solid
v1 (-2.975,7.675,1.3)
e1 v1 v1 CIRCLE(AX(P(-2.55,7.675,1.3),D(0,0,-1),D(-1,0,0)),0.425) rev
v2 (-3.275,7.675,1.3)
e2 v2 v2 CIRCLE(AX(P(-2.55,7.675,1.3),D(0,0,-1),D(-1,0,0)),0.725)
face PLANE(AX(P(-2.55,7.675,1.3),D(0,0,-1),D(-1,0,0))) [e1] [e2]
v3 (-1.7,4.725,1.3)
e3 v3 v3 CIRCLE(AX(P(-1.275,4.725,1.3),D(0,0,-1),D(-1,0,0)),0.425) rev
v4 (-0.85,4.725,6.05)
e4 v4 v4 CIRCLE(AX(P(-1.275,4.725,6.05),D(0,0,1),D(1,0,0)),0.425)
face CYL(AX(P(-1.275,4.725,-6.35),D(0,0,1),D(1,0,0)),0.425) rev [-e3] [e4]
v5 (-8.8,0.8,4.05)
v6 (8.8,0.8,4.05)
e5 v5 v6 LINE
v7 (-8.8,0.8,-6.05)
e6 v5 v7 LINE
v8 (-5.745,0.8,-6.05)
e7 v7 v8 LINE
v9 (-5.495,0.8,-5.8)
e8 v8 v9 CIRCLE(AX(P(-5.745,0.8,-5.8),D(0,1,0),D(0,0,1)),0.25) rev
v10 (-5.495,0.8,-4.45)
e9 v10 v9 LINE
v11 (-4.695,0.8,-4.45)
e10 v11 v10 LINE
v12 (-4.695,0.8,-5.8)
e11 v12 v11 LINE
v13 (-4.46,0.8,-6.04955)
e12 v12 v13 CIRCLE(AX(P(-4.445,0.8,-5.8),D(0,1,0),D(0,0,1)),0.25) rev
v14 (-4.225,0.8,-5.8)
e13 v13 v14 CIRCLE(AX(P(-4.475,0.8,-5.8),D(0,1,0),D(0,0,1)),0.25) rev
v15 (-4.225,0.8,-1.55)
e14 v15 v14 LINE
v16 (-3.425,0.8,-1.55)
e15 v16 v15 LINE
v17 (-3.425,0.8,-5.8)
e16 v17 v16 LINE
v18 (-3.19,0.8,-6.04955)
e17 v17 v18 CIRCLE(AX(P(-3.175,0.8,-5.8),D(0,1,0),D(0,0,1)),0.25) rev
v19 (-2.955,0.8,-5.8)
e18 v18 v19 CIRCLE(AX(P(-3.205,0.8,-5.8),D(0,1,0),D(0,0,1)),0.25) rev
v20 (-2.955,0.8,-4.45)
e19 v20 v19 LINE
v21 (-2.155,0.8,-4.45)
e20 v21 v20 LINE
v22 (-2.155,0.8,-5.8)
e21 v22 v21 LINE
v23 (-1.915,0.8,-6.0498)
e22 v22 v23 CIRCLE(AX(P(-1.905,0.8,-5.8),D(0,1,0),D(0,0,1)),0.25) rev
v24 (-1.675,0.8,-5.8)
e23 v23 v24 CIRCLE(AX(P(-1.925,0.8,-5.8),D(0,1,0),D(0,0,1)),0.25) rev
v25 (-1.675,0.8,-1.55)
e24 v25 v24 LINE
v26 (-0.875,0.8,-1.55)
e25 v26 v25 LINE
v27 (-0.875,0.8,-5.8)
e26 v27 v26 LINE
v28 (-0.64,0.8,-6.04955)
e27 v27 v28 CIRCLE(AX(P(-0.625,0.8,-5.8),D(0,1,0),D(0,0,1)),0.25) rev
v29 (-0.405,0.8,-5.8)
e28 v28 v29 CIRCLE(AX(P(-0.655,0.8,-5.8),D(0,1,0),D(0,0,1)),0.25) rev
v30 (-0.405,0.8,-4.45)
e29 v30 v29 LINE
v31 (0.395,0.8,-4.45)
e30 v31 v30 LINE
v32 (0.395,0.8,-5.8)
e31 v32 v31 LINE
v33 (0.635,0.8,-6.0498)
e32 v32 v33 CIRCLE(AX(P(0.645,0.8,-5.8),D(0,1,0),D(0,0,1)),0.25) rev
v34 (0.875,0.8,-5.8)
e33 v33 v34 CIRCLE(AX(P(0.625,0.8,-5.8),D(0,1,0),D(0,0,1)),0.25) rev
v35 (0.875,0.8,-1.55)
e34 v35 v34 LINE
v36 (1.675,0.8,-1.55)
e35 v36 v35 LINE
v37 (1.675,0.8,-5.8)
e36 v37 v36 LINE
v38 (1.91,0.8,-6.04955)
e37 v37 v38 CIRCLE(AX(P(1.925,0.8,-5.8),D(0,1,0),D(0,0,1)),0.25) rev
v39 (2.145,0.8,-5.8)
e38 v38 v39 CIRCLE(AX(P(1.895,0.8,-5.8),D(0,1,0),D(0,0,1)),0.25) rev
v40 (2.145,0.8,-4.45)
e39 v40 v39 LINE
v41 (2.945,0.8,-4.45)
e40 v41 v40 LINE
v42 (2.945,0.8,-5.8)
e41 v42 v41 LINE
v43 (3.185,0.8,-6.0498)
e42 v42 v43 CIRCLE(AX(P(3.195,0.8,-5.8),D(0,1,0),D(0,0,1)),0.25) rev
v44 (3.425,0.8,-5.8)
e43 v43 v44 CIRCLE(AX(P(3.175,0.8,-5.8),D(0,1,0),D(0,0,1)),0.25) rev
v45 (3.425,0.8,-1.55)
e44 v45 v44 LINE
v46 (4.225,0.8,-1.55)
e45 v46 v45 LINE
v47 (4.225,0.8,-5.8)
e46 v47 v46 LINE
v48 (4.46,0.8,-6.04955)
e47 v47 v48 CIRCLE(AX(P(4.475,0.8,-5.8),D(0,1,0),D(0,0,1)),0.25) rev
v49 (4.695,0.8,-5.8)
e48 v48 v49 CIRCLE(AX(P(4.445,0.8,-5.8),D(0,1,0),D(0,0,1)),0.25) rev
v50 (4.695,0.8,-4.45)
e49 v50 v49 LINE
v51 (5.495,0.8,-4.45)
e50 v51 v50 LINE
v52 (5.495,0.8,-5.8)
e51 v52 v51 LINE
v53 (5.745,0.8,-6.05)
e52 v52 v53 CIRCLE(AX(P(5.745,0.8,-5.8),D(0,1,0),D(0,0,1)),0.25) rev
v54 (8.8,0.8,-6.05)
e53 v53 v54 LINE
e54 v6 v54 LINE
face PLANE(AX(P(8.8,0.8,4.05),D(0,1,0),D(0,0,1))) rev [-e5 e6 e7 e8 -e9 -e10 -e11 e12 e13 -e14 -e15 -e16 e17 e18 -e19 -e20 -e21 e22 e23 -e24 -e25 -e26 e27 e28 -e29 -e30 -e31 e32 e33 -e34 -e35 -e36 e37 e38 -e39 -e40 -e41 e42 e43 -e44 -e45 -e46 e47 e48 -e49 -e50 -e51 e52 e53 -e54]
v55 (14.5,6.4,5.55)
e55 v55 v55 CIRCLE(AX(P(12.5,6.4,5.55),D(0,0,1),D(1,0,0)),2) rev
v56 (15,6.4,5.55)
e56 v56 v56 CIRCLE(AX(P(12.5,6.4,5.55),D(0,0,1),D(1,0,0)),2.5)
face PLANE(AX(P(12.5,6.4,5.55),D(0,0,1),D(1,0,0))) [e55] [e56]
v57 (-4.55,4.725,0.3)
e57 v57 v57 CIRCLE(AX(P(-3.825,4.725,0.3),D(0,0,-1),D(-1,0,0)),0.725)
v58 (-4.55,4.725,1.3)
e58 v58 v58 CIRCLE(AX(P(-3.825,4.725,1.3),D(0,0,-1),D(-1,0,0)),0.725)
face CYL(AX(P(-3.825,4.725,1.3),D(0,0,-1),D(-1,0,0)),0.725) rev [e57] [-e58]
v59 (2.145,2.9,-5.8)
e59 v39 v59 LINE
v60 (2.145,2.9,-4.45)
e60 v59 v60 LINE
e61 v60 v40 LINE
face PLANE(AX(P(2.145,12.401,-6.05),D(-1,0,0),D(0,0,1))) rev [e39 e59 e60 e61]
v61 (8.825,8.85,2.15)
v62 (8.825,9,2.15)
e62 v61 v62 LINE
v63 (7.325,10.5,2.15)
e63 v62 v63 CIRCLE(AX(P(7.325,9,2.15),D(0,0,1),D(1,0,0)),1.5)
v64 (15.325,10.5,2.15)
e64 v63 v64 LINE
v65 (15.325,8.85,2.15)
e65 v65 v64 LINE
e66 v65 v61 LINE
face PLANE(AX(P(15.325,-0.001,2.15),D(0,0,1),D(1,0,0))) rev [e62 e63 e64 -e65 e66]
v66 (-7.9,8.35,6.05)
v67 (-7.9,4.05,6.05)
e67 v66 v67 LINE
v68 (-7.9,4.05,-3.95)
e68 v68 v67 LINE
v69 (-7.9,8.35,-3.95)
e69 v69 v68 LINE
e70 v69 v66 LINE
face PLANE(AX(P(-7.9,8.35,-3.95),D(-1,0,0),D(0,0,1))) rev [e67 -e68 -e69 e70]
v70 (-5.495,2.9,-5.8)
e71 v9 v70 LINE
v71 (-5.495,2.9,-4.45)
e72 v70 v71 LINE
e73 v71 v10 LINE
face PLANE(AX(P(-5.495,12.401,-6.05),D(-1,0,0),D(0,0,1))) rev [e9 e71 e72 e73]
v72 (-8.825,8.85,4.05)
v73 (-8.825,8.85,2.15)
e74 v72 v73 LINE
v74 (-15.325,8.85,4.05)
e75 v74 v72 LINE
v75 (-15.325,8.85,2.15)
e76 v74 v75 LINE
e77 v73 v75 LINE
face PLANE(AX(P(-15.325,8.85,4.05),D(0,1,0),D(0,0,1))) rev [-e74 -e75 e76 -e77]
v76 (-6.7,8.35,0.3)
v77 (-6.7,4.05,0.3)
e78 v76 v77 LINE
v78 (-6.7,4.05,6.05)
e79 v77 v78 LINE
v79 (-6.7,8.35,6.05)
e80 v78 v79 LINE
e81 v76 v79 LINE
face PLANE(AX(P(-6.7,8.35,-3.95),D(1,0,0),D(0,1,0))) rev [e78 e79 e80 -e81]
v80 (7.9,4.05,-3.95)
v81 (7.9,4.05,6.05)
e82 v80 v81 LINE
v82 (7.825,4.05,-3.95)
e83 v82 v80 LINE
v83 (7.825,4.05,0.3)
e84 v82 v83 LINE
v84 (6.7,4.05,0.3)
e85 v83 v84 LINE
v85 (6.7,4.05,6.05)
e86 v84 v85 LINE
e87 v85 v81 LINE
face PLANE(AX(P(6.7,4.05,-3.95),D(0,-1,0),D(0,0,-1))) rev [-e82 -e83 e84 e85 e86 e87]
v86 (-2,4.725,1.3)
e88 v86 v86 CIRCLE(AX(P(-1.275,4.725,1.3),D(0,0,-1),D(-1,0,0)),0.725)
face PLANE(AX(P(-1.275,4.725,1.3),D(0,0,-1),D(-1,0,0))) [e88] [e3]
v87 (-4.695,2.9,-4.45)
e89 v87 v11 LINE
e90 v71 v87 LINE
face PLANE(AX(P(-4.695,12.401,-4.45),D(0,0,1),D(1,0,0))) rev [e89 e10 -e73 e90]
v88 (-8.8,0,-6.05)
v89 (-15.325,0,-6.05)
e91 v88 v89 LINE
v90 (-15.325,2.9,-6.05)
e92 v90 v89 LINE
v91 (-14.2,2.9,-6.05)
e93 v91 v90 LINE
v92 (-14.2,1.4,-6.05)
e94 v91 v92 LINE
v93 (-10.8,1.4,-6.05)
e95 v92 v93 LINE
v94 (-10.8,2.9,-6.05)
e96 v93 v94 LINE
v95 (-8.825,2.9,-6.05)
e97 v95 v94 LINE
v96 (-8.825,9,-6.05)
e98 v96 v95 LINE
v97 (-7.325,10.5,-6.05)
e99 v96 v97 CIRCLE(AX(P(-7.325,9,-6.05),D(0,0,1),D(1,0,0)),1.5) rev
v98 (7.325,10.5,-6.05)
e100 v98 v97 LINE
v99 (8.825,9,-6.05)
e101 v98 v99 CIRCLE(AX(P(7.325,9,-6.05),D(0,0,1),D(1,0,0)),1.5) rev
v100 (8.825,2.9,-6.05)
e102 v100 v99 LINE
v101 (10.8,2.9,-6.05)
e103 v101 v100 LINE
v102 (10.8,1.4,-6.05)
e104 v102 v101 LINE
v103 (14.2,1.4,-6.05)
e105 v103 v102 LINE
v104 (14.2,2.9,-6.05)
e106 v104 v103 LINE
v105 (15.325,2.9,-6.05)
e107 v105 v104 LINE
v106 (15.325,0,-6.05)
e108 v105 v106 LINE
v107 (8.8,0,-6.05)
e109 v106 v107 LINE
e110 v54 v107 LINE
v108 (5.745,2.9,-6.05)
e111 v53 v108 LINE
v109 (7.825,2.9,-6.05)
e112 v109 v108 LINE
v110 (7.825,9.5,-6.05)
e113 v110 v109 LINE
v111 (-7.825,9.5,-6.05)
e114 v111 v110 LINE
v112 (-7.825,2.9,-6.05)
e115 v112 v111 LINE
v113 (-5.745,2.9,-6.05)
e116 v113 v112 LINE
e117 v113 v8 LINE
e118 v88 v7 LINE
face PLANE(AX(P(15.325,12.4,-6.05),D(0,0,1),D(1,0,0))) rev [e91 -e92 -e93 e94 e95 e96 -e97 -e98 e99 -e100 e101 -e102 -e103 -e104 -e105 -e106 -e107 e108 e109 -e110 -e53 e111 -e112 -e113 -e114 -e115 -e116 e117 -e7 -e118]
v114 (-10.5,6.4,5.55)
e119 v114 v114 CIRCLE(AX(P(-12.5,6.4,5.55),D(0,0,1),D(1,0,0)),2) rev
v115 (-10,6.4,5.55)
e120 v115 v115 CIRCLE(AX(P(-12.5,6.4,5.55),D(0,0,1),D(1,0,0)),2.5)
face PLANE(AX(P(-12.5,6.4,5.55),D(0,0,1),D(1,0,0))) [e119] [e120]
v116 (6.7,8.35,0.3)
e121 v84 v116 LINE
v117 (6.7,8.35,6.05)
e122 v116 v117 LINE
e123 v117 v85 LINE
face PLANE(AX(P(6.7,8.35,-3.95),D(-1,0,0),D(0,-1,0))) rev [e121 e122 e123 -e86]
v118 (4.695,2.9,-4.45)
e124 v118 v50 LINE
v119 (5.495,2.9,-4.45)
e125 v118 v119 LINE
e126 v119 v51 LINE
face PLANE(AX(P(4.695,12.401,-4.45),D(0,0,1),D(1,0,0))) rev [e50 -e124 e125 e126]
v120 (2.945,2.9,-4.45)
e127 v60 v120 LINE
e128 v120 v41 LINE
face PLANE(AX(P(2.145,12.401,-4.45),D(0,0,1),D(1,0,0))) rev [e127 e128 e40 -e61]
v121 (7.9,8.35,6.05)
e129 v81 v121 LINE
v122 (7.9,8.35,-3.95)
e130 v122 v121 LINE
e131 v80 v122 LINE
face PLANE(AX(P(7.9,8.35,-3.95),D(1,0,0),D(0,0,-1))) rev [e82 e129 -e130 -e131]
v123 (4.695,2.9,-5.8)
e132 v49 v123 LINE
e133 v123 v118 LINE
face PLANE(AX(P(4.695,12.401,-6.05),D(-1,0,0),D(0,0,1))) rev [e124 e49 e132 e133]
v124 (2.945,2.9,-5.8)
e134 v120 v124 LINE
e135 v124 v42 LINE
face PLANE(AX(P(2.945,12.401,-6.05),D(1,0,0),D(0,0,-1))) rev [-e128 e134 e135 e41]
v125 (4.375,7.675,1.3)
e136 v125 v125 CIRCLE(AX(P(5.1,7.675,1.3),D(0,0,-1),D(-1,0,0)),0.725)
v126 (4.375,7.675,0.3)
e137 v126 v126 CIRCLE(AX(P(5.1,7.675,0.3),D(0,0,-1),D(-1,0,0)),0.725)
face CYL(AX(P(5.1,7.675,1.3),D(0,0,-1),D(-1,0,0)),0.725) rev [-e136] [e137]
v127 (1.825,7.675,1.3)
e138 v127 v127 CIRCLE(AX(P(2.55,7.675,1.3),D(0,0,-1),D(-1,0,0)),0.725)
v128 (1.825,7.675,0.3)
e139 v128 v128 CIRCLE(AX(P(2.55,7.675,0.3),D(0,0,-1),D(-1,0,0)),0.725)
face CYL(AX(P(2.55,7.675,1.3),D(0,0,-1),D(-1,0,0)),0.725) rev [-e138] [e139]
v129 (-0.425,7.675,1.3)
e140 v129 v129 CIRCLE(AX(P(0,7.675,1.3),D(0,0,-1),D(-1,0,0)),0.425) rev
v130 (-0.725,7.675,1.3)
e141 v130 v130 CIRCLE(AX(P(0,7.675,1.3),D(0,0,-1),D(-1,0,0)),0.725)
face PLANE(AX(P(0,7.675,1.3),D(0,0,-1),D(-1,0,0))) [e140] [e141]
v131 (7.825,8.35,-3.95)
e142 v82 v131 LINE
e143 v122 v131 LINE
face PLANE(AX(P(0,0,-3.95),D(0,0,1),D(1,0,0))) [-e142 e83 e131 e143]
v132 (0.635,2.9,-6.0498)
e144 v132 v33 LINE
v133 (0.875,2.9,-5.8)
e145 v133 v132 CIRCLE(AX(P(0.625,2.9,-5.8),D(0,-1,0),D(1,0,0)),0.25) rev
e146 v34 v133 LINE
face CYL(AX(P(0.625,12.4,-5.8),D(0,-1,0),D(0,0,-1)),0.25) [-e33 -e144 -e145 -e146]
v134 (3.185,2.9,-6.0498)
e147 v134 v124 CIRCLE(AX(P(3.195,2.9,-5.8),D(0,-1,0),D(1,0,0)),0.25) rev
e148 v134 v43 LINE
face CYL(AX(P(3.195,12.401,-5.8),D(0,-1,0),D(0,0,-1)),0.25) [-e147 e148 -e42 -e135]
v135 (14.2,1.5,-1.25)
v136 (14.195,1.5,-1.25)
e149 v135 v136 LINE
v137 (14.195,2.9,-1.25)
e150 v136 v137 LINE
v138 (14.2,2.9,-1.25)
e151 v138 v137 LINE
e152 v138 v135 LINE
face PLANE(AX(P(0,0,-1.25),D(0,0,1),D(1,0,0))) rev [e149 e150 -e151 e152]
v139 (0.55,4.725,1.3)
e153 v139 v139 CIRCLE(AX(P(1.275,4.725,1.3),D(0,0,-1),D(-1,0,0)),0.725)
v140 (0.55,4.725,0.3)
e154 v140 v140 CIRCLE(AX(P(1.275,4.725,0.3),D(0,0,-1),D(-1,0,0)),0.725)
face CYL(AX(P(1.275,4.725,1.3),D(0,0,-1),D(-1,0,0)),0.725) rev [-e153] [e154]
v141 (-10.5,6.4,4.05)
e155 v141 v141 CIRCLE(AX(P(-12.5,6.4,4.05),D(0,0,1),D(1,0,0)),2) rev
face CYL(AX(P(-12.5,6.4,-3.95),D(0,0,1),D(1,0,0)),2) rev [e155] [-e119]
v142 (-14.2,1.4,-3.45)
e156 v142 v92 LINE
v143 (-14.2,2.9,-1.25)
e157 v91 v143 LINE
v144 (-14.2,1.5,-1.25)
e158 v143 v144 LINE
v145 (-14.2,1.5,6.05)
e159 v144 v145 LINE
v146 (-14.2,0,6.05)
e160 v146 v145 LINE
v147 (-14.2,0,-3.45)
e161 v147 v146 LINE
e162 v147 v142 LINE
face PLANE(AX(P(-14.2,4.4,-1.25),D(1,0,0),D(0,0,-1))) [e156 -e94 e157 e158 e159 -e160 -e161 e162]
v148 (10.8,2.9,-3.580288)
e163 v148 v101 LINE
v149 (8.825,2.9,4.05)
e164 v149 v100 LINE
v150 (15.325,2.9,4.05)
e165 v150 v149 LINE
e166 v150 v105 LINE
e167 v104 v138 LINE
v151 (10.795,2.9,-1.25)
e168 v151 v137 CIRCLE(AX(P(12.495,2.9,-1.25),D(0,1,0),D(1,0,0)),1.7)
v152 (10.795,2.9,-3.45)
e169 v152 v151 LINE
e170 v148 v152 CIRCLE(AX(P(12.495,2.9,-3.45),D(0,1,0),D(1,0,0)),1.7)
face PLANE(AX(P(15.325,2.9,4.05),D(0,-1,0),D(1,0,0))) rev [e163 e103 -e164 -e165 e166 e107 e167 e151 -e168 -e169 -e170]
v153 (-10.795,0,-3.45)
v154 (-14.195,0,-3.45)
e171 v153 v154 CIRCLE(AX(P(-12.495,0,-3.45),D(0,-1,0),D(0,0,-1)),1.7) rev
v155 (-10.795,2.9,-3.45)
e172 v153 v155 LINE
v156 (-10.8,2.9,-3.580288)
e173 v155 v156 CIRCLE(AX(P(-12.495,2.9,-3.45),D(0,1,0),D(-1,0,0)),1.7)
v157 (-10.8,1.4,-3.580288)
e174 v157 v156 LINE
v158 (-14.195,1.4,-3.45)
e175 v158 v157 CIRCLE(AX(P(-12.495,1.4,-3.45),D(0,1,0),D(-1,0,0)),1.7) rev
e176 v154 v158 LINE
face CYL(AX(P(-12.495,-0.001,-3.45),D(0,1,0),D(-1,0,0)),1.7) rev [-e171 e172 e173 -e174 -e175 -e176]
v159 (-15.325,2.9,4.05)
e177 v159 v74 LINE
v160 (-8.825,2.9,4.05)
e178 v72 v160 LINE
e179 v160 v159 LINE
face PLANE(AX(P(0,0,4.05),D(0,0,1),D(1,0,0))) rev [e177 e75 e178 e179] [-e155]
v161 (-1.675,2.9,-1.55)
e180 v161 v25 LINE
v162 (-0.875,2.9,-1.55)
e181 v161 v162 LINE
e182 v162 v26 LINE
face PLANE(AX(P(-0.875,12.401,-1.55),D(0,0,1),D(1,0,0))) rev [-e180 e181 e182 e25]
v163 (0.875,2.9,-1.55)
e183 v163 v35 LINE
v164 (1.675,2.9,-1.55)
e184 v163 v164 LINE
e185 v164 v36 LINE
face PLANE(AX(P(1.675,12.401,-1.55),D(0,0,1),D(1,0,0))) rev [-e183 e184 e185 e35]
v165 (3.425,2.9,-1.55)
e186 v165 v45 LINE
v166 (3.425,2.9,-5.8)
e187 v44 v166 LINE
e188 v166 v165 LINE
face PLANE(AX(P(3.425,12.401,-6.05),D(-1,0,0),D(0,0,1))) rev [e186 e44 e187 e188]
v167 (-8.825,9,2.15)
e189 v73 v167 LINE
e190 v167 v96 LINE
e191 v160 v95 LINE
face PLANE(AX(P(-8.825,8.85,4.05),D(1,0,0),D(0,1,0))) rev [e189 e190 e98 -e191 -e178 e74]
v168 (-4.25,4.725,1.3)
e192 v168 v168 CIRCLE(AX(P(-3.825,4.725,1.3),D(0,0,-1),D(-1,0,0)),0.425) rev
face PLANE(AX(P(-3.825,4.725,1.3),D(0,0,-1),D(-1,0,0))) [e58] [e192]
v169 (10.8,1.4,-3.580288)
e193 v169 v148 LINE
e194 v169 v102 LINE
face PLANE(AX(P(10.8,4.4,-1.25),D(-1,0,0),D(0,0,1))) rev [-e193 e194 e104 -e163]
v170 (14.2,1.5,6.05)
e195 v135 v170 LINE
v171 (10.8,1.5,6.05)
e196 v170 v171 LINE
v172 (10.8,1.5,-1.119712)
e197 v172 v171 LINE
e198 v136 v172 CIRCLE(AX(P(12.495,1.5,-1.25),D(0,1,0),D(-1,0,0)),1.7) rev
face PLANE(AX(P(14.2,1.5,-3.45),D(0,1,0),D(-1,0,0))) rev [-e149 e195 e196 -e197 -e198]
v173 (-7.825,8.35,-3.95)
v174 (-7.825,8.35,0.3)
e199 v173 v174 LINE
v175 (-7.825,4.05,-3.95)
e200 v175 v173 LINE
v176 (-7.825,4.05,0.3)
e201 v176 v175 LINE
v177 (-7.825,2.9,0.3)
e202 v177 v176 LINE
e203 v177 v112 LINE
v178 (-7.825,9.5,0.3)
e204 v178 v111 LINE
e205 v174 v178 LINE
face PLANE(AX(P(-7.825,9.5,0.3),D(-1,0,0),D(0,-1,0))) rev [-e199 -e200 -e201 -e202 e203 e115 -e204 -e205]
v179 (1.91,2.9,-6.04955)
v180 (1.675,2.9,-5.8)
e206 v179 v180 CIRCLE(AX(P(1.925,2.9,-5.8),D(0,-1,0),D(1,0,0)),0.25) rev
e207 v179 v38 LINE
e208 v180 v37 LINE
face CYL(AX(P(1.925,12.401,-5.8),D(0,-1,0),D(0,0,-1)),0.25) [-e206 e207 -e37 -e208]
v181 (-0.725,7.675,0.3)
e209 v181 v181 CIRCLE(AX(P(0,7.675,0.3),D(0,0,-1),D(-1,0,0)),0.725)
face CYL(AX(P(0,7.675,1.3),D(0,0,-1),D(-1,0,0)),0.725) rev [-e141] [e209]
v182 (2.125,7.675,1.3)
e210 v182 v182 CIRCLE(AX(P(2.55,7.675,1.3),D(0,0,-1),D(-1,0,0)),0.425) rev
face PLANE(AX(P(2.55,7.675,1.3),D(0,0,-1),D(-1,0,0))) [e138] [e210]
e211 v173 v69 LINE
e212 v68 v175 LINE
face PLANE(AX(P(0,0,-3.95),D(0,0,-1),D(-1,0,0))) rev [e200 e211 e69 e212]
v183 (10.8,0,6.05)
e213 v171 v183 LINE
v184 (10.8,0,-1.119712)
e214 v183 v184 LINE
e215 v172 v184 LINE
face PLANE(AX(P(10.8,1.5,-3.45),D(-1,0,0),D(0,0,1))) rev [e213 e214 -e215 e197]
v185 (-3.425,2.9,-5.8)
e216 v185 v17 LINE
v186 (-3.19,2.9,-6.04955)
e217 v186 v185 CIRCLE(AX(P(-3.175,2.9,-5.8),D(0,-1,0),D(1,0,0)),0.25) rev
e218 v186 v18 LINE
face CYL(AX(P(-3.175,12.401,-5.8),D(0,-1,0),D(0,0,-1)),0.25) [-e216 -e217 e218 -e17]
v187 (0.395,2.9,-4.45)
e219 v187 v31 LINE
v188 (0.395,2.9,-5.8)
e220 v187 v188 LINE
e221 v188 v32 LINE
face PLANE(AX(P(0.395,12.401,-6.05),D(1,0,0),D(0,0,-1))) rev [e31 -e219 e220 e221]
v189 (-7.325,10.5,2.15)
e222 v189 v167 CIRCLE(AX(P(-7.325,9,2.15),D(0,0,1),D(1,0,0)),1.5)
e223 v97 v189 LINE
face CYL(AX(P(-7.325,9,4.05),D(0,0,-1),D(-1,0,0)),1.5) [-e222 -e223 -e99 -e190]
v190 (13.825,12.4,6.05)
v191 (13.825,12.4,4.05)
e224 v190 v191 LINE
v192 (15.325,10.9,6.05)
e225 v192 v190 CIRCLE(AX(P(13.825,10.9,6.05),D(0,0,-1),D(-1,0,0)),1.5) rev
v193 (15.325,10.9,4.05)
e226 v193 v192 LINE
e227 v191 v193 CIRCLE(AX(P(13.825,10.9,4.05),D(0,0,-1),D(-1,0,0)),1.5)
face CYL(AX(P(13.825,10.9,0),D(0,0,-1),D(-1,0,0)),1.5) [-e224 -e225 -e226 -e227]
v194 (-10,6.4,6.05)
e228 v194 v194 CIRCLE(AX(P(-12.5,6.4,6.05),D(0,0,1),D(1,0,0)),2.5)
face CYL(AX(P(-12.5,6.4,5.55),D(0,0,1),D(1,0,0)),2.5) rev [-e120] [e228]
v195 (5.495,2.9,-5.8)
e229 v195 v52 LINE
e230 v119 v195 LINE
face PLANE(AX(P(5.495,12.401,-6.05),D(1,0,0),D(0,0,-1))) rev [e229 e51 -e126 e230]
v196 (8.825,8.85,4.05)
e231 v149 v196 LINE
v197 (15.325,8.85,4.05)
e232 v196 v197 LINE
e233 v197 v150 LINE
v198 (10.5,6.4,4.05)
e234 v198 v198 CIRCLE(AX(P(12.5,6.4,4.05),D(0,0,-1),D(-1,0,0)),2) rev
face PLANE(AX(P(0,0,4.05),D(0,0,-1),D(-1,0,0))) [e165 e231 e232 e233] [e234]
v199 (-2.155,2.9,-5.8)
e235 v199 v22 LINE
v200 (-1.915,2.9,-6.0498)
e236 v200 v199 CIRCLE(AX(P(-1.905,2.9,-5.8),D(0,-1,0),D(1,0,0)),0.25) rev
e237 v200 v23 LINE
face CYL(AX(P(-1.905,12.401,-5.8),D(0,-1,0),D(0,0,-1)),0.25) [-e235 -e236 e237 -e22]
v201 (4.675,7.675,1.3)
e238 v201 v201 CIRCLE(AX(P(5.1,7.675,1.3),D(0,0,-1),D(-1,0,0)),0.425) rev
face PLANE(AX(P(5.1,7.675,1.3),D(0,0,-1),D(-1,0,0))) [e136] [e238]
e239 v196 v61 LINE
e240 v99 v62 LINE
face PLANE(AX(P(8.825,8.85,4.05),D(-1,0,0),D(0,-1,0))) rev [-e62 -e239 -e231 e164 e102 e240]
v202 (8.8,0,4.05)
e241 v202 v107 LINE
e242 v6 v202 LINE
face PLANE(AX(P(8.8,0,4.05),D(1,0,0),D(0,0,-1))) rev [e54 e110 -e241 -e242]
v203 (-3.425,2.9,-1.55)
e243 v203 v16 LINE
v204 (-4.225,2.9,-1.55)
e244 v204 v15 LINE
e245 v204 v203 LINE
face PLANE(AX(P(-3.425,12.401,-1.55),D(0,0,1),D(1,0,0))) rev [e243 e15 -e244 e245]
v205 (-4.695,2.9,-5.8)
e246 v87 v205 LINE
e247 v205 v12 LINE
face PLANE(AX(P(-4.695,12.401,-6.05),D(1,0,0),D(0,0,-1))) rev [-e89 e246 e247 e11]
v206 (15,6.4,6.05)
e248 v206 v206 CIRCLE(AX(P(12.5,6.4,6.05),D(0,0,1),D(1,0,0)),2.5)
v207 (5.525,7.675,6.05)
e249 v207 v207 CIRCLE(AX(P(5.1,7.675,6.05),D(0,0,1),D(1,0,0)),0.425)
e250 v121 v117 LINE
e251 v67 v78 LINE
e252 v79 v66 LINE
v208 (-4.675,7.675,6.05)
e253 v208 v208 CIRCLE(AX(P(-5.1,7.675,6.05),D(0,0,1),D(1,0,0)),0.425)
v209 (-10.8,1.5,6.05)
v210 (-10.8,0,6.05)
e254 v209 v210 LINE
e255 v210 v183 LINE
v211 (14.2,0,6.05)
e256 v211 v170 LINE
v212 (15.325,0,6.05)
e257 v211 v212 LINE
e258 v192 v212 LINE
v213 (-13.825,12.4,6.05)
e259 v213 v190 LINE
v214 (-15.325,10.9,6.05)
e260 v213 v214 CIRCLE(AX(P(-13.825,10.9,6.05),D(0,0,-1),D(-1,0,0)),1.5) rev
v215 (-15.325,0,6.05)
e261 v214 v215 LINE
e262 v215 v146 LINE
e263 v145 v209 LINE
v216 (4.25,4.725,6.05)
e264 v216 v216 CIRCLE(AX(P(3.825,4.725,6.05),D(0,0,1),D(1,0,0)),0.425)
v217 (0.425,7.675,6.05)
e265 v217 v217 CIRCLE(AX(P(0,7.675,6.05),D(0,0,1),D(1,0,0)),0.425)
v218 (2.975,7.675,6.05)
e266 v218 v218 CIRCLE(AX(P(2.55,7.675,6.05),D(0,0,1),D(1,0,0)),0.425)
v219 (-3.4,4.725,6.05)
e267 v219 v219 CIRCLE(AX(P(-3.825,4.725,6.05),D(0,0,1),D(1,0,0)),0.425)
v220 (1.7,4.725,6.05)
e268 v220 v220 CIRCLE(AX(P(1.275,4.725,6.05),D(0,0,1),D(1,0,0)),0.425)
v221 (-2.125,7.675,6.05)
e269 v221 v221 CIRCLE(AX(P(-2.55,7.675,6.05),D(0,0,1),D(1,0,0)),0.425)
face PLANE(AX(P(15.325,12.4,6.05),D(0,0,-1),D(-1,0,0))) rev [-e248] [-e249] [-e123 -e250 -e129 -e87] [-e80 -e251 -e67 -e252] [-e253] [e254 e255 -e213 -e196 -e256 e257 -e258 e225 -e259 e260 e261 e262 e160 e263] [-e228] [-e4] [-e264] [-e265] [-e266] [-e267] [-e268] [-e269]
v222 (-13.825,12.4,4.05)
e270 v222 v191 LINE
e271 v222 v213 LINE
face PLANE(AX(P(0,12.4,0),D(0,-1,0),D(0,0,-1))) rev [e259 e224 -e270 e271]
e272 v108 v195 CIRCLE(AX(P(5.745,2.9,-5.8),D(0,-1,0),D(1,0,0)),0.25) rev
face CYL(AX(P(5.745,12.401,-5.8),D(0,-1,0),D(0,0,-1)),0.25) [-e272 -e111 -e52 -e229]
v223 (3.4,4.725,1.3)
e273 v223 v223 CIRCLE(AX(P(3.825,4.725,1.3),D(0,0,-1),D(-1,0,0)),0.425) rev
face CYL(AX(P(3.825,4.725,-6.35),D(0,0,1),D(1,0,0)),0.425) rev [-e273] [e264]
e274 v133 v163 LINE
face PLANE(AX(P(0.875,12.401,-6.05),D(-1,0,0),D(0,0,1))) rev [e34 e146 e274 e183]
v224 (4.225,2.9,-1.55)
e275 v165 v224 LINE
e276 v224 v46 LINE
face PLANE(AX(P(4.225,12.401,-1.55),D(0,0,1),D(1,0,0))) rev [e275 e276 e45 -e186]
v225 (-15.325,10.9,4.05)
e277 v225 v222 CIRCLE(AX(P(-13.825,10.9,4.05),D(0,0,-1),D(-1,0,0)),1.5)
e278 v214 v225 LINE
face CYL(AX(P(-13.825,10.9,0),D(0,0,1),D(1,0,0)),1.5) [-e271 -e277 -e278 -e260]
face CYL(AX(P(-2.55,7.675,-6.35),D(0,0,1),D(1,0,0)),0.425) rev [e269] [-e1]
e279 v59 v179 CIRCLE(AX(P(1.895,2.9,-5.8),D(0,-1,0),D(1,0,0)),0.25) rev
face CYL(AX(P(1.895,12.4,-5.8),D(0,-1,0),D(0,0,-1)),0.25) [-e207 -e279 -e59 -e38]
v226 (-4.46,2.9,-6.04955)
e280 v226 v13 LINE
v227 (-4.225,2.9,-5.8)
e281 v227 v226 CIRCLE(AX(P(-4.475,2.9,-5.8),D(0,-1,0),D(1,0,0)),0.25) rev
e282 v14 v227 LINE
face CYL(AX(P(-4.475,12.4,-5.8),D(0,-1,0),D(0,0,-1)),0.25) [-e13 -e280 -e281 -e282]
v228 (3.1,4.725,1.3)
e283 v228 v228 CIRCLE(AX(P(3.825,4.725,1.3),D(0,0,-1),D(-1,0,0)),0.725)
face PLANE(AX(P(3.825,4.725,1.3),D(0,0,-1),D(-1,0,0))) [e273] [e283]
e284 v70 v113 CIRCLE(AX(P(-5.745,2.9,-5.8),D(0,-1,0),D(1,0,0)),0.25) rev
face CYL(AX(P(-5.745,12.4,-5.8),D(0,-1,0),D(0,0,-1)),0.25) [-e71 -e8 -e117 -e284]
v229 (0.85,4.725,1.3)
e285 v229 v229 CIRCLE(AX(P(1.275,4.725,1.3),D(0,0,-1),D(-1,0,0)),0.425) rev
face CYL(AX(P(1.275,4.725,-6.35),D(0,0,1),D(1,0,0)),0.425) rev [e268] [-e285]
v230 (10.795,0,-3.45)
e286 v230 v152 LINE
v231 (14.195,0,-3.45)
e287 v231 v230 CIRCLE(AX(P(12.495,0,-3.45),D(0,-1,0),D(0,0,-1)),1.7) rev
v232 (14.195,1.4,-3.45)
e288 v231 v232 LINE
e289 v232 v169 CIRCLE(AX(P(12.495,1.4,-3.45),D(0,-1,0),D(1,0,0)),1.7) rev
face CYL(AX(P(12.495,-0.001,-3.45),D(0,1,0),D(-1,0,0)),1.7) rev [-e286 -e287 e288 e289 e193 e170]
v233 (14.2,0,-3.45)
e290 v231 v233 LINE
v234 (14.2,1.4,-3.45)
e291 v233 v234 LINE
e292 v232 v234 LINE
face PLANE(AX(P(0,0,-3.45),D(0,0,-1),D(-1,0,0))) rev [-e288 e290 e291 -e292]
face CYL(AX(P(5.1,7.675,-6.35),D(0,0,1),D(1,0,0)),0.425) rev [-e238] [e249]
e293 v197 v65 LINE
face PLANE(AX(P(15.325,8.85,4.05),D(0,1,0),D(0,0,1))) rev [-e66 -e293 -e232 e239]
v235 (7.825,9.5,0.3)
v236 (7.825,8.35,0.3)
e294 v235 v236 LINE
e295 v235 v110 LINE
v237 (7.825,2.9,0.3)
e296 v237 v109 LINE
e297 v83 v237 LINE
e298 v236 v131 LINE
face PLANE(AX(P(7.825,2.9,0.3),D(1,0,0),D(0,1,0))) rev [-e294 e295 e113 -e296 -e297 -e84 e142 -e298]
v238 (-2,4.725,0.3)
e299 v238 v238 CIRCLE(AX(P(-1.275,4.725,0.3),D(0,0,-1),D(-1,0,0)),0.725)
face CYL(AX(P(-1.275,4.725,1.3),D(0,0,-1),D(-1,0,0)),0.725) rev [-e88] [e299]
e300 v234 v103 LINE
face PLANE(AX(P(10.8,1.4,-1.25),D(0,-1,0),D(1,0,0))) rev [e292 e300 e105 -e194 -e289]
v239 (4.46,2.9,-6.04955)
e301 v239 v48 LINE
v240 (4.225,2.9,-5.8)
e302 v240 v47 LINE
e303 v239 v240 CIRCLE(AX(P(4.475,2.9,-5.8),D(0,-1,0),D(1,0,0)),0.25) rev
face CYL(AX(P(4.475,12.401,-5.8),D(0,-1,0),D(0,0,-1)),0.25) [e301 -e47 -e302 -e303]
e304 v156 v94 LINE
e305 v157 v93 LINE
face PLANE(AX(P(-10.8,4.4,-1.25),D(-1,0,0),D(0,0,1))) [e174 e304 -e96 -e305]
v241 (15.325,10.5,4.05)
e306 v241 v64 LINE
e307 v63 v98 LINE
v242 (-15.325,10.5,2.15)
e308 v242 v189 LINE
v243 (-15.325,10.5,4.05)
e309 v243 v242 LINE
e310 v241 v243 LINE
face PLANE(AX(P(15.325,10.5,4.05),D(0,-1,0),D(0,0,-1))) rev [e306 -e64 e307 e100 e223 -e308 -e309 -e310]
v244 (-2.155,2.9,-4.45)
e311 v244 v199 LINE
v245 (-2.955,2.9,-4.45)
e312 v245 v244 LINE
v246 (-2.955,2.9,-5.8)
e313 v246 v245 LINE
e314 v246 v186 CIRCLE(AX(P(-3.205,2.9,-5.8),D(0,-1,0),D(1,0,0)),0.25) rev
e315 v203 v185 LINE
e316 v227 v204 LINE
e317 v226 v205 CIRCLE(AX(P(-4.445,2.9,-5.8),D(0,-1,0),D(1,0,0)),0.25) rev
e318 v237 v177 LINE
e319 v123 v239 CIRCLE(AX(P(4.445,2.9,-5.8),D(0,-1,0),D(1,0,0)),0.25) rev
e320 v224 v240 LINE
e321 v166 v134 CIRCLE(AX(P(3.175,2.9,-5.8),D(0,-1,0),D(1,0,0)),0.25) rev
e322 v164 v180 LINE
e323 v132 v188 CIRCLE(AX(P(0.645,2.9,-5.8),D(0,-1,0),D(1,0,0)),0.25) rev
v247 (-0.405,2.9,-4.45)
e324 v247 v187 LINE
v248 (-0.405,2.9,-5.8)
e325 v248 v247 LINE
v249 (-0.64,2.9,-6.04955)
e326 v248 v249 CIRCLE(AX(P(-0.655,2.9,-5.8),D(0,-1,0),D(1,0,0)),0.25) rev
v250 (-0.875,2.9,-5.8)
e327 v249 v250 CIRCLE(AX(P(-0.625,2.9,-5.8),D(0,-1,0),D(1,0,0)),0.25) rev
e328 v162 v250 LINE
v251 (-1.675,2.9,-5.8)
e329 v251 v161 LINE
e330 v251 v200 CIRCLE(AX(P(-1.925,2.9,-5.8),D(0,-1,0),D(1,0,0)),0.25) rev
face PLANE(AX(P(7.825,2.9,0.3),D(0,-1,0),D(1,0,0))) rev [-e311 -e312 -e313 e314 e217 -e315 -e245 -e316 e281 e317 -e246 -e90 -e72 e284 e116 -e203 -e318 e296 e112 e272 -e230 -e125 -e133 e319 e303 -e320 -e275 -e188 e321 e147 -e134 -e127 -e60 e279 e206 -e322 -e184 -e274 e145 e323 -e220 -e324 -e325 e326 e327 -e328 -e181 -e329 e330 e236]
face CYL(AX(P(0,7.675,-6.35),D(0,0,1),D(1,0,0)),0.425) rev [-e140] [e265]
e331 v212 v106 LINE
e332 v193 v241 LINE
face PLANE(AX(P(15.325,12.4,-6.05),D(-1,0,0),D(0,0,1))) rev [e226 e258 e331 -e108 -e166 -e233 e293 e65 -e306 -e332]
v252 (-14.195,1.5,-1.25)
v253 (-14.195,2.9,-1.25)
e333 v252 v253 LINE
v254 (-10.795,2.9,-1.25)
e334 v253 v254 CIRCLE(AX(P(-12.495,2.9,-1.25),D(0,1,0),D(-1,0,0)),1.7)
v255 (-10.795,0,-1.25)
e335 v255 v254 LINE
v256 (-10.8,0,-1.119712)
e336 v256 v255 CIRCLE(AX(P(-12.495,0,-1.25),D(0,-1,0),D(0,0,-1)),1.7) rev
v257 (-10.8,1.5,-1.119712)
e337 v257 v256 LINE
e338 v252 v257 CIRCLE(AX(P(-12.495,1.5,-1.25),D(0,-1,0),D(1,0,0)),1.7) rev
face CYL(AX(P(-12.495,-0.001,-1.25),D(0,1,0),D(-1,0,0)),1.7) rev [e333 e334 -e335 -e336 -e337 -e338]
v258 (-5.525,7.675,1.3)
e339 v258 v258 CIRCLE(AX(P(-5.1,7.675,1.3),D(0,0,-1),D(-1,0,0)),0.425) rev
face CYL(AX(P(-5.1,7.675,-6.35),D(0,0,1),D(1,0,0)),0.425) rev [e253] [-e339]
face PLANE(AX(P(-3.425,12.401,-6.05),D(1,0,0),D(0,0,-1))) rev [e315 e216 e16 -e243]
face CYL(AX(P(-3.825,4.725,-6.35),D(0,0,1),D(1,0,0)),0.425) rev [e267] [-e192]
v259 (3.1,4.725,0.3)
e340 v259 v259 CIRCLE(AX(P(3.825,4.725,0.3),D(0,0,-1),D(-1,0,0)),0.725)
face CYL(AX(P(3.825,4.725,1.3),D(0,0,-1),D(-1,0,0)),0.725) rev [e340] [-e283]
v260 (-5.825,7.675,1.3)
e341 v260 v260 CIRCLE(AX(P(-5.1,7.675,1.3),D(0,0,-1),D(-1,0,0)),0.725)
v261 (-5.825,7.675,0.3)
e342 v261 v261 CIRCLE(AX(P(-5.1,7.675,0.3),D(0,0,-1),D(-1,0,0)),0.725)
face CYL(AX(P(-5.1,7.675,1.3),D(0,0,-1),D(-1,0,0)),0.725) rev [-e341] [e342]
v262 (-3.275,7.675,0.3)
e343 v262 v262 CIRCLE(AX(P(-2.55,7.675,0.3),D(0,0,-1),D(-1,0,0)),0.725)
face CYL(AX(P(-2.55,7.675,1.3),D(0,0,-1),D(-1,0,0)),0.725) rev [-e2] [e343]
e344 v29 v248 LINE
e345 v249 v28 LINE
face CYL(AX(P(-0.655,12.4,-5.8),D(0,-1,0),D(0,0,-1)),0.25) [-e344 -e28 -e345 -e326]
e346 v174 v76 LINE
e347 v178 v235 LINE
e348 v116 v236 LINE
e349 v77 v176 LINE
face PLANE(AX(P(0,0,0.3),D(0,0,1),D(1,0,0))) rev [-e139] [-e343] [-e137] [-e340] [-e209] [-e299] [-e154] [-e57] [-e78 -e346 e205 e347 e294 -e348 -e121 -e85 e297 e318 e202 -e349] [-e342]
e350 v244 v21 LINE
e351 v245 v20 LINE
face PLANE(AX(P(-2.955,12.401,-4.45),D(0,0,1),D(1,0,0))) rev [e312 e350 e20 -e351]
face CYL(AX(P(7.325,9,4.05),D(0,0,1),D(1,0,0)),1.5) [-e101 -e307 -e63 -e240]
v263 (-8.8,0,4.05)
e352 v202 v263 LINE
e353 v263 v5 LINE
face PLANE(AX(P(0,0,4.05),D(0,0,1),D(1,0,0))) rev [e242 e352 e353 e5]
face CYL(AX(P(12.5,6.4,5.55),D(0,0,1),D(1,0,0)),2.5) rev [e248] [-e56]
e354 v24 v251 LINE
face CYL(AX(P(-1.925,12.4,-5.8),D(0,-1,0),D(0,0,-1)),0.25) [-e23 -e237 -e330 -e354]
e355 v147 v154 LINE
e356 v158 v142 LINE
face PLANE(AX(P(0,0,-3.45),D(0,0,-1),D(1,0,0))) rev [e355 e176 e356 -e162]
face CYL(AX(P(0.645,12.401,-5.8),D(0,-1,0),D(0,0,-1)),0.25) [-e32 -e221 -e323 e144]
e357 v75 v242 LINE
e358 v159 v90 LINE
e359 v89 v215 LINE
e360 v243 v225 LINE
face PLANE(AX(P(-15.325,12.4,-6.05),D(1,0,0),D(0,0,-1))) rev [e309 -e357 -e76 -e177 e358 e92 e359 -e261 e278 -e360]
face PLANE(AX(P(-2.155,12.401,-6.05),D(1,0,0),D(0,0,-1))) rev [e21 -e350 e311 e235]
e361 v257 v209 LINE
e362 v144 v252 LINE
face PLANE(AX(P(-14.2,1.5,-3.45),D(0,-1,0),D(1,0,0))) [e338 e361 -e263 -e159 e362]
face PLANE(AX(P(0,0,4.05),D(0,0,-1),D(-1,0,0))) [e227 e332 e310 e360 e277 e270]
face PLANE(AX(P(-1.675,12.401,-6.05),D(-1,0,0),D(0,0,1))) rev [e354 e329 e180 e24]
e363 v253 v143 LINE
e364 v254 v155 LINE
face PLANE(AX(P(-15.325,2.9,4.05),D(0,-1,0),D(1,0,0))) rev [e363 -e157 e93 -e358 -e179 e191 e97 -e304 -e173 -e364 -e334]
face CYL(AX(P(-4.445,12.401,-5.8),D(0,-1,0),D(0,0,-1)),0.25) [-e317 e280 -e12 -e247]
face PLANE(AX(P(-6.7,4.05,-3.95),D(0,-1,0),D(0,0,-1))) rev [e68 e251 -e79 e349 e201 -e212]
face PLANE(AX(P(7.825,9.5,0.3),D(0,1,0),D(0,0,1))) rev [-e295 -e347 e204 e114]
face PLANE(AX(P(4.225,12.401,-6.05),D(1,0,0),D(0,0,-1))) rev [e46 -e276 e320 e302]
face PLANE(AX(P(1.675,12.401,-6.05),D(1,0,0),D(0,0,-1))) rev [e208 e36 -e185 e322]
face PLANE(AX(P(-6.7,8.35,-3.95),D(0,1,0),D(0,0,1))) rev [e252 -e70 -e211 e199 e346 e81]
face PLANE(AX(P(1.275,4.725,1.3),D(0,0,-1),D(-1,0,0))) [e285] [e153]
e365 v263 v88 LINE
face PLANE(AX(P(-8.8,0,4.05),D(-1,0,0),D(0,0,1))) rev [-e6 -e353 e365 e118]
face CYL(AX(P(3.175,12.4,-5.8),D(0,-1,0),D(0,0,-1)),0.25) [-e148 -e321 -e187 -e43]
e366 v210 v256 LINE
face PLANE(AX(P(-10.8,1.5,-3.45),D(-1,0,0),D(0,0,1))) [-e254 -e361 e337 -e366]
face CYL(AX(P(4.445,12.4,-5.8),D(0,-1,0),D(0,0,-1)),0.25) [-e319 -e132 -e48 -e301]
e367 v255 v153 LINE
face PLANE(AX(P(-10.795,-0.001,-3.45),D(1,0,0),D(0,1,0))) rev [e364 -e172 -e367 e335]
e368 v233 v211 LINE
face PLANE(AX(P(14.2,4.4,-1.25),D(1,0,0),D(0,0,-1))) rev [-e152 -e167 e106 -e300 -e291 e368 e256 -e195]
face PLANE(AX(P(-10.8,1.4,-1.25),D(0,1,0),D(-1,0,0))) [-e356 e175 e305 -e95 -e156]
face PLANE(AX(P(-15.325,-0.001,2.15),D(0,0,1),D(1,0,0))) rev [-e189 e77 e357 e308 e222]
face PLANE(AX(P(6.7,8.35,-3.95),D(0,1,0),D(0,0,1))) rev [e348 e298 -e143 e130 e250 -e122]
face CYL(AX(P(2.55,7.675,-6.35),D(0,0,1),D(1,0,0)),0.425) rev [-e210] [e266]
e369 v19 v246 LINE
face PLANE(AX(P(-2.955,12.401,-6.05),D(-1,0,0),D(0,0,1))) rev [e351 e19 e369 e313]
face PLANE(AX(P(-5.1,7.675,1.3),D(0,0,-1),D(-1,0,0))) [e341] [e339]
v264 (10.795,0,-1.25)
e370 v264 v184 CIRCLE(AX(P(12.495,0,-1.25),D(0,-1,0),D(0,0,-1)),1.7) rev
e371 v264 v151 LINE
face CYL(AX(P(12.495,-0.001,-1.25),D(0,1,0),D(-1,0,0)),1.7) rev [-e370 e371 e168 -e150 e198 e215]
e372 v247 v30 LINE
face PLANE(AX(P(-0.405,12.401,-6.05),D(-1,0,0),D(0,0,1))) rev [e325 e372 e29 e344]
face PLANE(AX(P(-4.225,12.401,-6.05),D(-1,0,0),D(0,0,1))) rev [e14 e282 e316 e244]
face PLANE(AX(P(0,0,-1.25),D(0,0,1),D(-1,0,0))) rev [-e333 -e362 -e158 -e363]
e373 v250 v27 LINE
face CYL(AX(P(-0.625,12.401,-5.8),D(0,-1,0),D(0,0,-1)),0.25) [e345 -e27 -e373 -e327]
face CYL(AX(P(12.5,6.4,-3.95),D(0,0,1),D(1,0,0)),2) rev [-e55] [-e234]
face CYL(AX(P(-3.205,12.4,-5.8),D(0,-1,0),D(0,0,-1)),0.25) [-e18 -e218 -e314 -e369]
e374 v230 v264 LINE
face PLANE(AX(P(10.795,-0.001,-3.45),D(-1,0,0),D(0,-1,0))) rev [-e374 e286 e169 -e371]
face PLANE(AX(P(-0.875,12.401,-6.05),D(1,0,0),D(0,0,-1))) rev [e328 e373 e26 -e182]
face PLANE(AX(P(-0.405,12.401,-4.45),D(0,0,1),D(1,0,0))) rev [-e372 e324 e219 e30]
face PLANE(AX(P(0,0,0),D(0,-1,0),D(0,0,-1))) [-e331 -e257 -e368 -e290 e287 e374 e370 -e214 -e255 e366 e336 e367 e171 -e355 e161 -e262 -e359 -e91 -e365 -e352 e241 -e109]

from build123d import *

# Parameters (mm, degrees)
SKETCH1_W           = 30.65
SKETCH1_H           = 12.1
BOSS_EXTRUDE1_DEPTH = 12.4
SKETCH2_R           = 2
SKETCH2_W           = 1.2
SKETCH2_H           = 4.3
CUT_EXTRUDE1_DEPTH  = 10
SKETCH3_R           = 0.425
CUT_EXTRUDE2_DEPTH  = 12.4
SKETCH4_W           = 30.65
SKETCH4_H           = 1.9
SKETCH4_W_2         = 17.6
SKETCH4_H_2         = 0.8
SKETCH4_W_3         = 6.5
SKETCH4_H_3         = 5.95
CUT_EXTRUDE3_DEPTH  = 10.1
CUT_EXTRUDE4_REACH  = 21.537
SKETCH6_W           = 6.5
SKETCH6_H           = 8.2
SKETCH7_W           = 15.65
SKETCH7_H           = 6.6
CUT_EXTRUDE5_DEPTH  = 6.35
CUT_EXTRUDE6_REACH  = 21.019
FILLET1_R           = 1.5
SKETCH10_W          = 3.4
SKETCH10_H          = 3
CUT_EXTRUDE7_DEPTH  = 4.8
SKETCH11_W          = 3.4
SKETCH11_H          = 3
CUT_EXTRUDE8_DEPTH  = 9.5
FILLET2_R           = 1.5
SKETCH12_R          = 2.5
CUT_EXTRUDE9_DEPTH  = 0.5
CUT_EXTRUDE10_REACH = 22.15
SKETCH13_W          = 0.8
SKETCH13_H          = 1.6
SKETCH13_H_2        = 4.5
FILLET3_R           = 0.25
SKETCH14_R          = 0.725
CUT_EXTRUDE11_DEPTH = 1


with BuildPart() as part:
    # Sketch1 → Boss-Extrude1 (new body)
    with BuildSketch(Plane(origin=(0, 0, 0), x_dir=(1, 0, 0), z_dir=(0, 1, 0))):
        Rectangle(SKETCH1_W, SKETCH1_H)
    extrude(amount=BOSS_EXTRUDE1_DEPTH)

    # Sketch2 → Cut-Extrude1 (cut)
    with BuildSketch(Plane.XY.offset(6.05)):
        with Locations((-12.5, 6.4)):
            Circle(SKETCH2_R)
        with Locations(Location((12.5, 6.4, 0), (0, 0, 180))):
            Circle(SKETCH2_R)
        with Locations((-7.3, 6.2)):
            Rectangle(SKETCH2_W, SKETCH2_H)
        with Locations((7.3, 6.2)):
            Rectangle(SKETCH2_W, SKETCH2_H)
    extrude(amount=-CUT_EXTRUDE1_DEPTH, mode=Mode.SUBTRACT)

    # Sketch3 → Cut-Extrude2 (cut)
    with BuildSketch(Plane.XY.offset(6.05)):
        with Locations((-5.1, 7.675)):
            Circle(SKETCH3_R)
        with Locations((-2.55, 7.675)):
            Circle(SKETCH3_R)
        with Locations((0, 7.675)):
            Circle(SKETCH3_R)
        with Locations((2.55, 7.675)):
            Circle(SKETCH3_R)
        with Locations((5.1, 7.675)):
            Circle(SKETCH3_R)
        with Locations((-3.825, 4.725)):
            Circle(SKETCH3_R)
        with Locations((-1.275, 4.725)):
            Circle(SKETCH3_R)
        with Locations((1.275, 4.725)):
            Circle(SKETCH3_R)
        with Locations((3.825, 4.725)):
            Circle(SKETCH3_R)
    extrude(amount=-CUT_EXTRUDE2_DEPTH, mode=Mode.SUBTRACT)

    # Sketch4 → Cut-Extrude3 (cut)
    with BuildSketch(Plane(origin=(0, 0, -6.05), x_dir=(-1, 0, 0), z_dir=(0, 0, -1))):
        with Locations((0, 11.45)):
            Rectangle(SKETCH4_W, SKETCH4_H)
        with Locations((0, 0.4)):
            Rectangle(SKETCH4_W_2, SKETCH4_H_2)
        with Locations((12.075, 5.875)):
            Rectangle(SKETCH4_W_3, SKETCH4_H_3)
        with Locations((-12.075, 5.875)):
            Rectangle(SKETCH4_W_3, SKETCH4_H_3)
    extrude(amount=-CUT_EXTRUDE3_DEPTH, mode=Mode.SUBTRACT)

    # Sketch6 → Cut-Extrude4 (cut, up to next)
    with BuildSketch(Plane(origin=(0, 10.5, 0), x_dir=(1, 0, 0), z_dir=(0, 1, 0)), mode=Mode.PRIVATE) as cut_extrude4_sk1:
        with Locations((12.075, 1.95)):
            Rectangle(SKETCH6_W, SKETCH6_H)
    cut_extrude4_tool1 = extrude(cut_extrude4_sk1.sketch, amount=-CUT_EXTRUDE4_REACH, mode=Mode.PRIVATE) & part.part
    # Sketch6 → Cut-Extrude4 (cut, up to next)
    with BuildSketch(Plane(origin=(0, 10.5, 0), x_dir=(1, 0, 0), z_dir=(0, 1, 0)), mode=Mode.PRIVATE) as cut_extrude4_sk2:
        with Locations((-12.075, 1.95)):
            Rectangle(SKETCH6_W, SKETCH6_H)
    cut_extrude4_tool2 = extrude(cut_extrude4_sk2.sketch, amount=-CUT_EXTRUDE4_REACH, mode=Mode.PRIVATE) & part.part
    add(cut_extrude4_tool1.solids().sort_by_distance((12.075, 10.5, -1.95))[0], mode=Mode.SUBTRACT)
    add(cut_extrude4_tool2.solids().sort_by_distance((-12.075, 10.5, -1.95))[0], mode=Mode.SUBTRACT)

    # Sketch7 → Cut-Extrude5 (cut)
    with BuildSketch(Plane(origin=(0, 0, -6.05), x_dir=(-1, 0, 0), z_dir=(0, 0, -1))):
        with Locations((0, 6.2)):
            Rectangle(SKETCH7_W, SKETCH7_H)
    extrude(amount=-CUT_EXTRUDE5_DEPTH, mode=Mode.SUBTRACT)

    # Sketch8 → Cut-Extrude6 (cut, up to next)
    with BuildSketch(Plane(origin=(0, 2.9, 0), x_dir=(1, 0, 0), z_dir=(0, 1, 0)), mode=Mode.PRIVATE) as cut_extrude6_sk1:
        with BuildLine():
            Line((-10.795, 3.45), (-10.795, 1.25))
            ThreePointArc((-10.795, 1.25), (-12.495, -0.45), (-14.195, 1.25))
            Line((-14.195, 1.25), (-14.195, 3.45))
            ThreePointArc((-14.195, 3.45), (-12.495, 5.15), (-10.795, 3.45))
        make_face()
    cut_extrude6_tool1 = extrude(cut_extrude6_sk1.sketch, amount=-CUT_EXTRUDE6_REACH, mode=Mode.PRIVATE) & part.part
    # Sketch8 → Cut-Extrude6 (cut, up to next)
    with BuildSketch(Plane(origin=(0, 2.9, 0), x_dir=(1, 0, 0), z_dir=(0, 1, 0)), mode=Mode.PRIVATE) as cut_extrude6_sk2:
        with BuildLine():
            Line((10.795, 3.45), (10.795, 1.25))
            ThreePointArc((10.795, 1.25), (12.495, -0.45), (14.195, 1.25))
            Line((14.195, 1.25), (14.195, 3.45))
            ThreePointArc((14.195, 3.45), (12.495, 5.15), (10.795, 3.45))
        make_face()
    cut_extrude6_tool2 = extrude(cut_extrude6_sk2.sketch, amount=-CUT_EXTRUDE6_REACH, mode=Mode.PRIVATE) & part.part
    add(cut_extrude6_tool1.solids().sort_by_distance((-12.495, 2.9, -2.35))[0], mode=Mode.SUBTRACT)
    add(cut_extrude6_tool2.solids().sort_by_distance((12.495, 2.9, -2.35))[0], mode=Mode.SUBTRACT)

    # Fillet1
    fillet1_edges = [part.edges().sort_by_distance(p)[0] for p in [
        (8.825, 10.5, -1.95),
        (-8.825, 10.5, -1.95),
    ]]
    fillet(fillet1_edges, radius=FILLET1_R)

    # Sketch10 → Cut-Extrude7 (cut)
    with BuildSketch(Plane(origin=(0, 0, -6.05), x_dir=(-1, 0, 0), z_dir=(0, 0, -1))):
        with Locations((-12.5, 2.9)):
            Rectangle(SKETCH10_W, SKETCH10_H)
    cut_extrude7 = extrude(amount=-CUT_EXTRUDE7_DEPTH, mode=Mode.SUBTRACT)

    # Sketch11 → Cut-Extrude8 (cut)
    with BuildSketch(Plane.XY.offset(6.05)):
        with Locations((12.5, 0)):
            Rectangle(SKETCH11_W, SKETCH11_H)
    cut_extrude8 = extrude(amount=-CUT_EXTRUDE8_DEPTH, mode=Mode.SUBTRACT)

    # Mirror3: Cut-Extrude7, Cut-Extrude8 across plane
    add(cut_extrude7.mirror(Plane(origin=(0, 0, 0), x_dir=(0, 0, 1), z_dir=(1, 0, 0))), mode=Mode.SUBTRACT)
    add(cut_extrude8.mirror(Plane(origin=(0, 0, 0), x_dir=(0, 0, 1), z_dir=(1, 0, 0))), mode=Mode.SUBTRACT)

    # Fillet2
    fillet2_edges = [part.edges().sort_by_distance(p)[0] for p in [
        (15.325, 12.4, 5.05),
        (-15.325, 12.4, 5.05),
    ]]
    fillet(fillet2_edges, radius=FILLET2_R)

    # Sketch12 → Cut-Extrude9 (cut)
    with BuildSketch(Plane.XY.offset(6.05)):
        with Locations((-12.5, 6.4)):
            Circle(SKETCH12_R)
        with Locations((12.5, 6.4)):
            Circle(SKETCH12_R)
    extrude(amount=-CUT_EXTRUDE9_DEPTH, mode=Mode.SUBTRACT)

    # Sketch13 → Cut-Extrude10 (cut, up to next)
    with BuildSketch(Plane.XZ.offset(-0.8), mode=Mode.PRIVATE) as cut_extrude10_sk1:
        with Locations((5.095, -5.25)):
            Rectangle(SKETCH13_W, SKETCH13_H)
    cut_extrude10_tool1 = extrude(cut_extrude10_sk1.sketch, amount=-CUT_EXTRUDE10_REACH, mode=Mode.PRIVATE) & part.part
    # Sketch13 → Cut-Extrude10 (cut, up to next)
    with BuildSketch(Plane.XZ.offset(-0.8), mode=Mode.PRIVATE) as cut_extrude10_sk2:
        with Locations((1.275, -3.8)):
            Rectangle(SKETCH13_W, SKETCH13_H_2)
    cut_extrude10_tool2 = extrude(cut_extrude10_sk2.sketch, amount=-CUT_EXTRUDE10_REACH, mode=Mode.PRIVATE) & part.part
    # Sketch13 → Cut-Extrude10 (cut, up to next)
    with BuildSketch(Plane.XZ.offset(-0.8), mode=Mode.PRIVATE) as cut_extrude10_sk3:
        with Locations((3.825, -3.8)):
            Rectangle(SKETCH13_W, SKETCH13_H_2)
    cut_extrude10_tool3 = extrude(cut_extrude10_sk3.sketch, amount=-CUT_EXTRUDE10_REACH, mode=Mode.PRIVATE) & part.part
    # Sketch13 → Cut-Extrude10 (cut, up to next)
    with BuildSketch(Plane.XZ.offset(-0.8), mode=Mode.PRIVATE) as cut_extrude10_sk4:
        with Locations((2.545, -5.25)):
            Rectangle(SKETCH13_W, SKETCH13_H)
    cut_extrude10_tool4 = extrude(cut_extrude10_sk4.sketch, amount=-CUT_EXTRUDE10_REACH, mode=Mode.PRIVATE) & part.part
    # Sketch13 → Cut-Extrude10 (cut, up to next)
    with BuildSketch(Plane.XZ.offset(-0.8), mode=Mode.PRIVATE) as cut_extrude10_sk5:
        with Locations((-1.275, -3.8)):
            Rectangle(SKETCH13_W, SKETCH13_H_2)
    cut_extrude10_tool5 = extrude(cut_extrude10_sk5.sketch, amount=-CUT_EXTRUDE10_REACH, mode=Mode.PRIVATE) & part.part
    # Sketch13 → Cut-Extrude10 (cut, up to next)
    with BuildSketch(Plane.XZ.offset(-0.8), mode=Mode.PRIVATE) as cut_extrude10_sk6:
        with Locations((-0.005, -5.25)):
            Rectangle(SKETCH13_W, SKETCH13_H)
    cut_extrude10_tool6 = extrude(cut_extrude10_sk6.sketch, amount=-CUT_EXTRUDE10_REACH, mode=Mode.PRIVATE) & part.part
    # Sketch13 → Cut-Extrude10 (cut, up to next)
    with BuildSketch(Plane.XZ.offset(-0.8), mode=Mode.PRIVATE) as cut_extrude10_sk7:
        with Locations((-3.825, -3.8)):
            Rectangle(SKETCH13_W, SKETCH13_H_2)
    cut_extrude10_tool7 = extrude(cut_extrude10_sk7.sketch, amount=-CUT_EXTRUDE10_REACH, mode=Mode.PRIVATE) & part.part
    # Sketch13 → Cut-Extrude10 (cut, up to next)
    with BuildSketch(Plane.XZ.offset(-0.8), mode=Mode.PRIVATE) as cut_extrude10_sk8:
        with Locations((-2.555, -5.25)):
            Rectangle(SKETCH13_W, SKETCH13_H)
    cut_extrude10_tool8 = extrude(cut_extrude10_sk8.sketch, amount=-CUT_EXTRUDE10_REACH, mode=Mode.PRIVATE) & part.part
    # Sketch13 → Cut-Extrude10 (cut, up to next)
    with BuildSketch(Plane.XZ.offset(-0.8), mode=Mode.PRIVATE) as cut_extrude10_sk9:
        with Locations((-5.095, -5.25)):
            Rectangle(SKETCH13_W, SKETCH13_H)
    cut_extrude10_tool9 = extrude(cut_extrude10_sk9.sketch, amount=-CUT_EXTRUDE10_REACH, mode=Mode.PRIVATE) & part.part
    add(cut_extrude10_tool1.solids().sort_by_distance((5.095, 0.8, -5.25))[0], mode=Mode.SUBTRACT)
    add(cut_extrude10_tool2.solids().sort_by_distance((1.275, 0.8, -3.8))[0], mode=Mode.SUBTRACT)
    add(cut_extrude10_tool3.solids().sort_by_distance((3.825, 0.8, -3.8))[0], mode=Mode.SUBTRACT)
    add(cut_extrude10_tool4.solids().sort_by_distance((2.545, 0.8, -5.25))[0], mode=Mode.SUBTRACT)
    add(cut_extrude10_tool5.solids().sort_by_distance((-1.275, 0.8, -3.8))[0], mode=Mode.SUBTRACT)
    add(cut_extrude10_tool6.solids().sort_by_distance((-0.005, 0.8, -5.25))[0], mode=Mode.SUBTRACT)
    add(cut_extrude10_tool7.solids().sort_by_distance((-3.825, 0.8, -3.8))[0], mode=Mode.SUBTRACT)
    add(cut_extrude10_tool8.solids().sort_by_distance((-2.555, 0.8, -5.25))[0], mode=Mode.SUBTRACT)
    add(cut_extrude10_tool9.solids().sort_by_distance((-5.095, 0.8, -5.25))[0], mode=Mode.SUBTRACT)

    # Fillet3
    # the kernel refuses this fillet: 0.25 mm, written as the material it takes off along each edge
    with BuildSketch(Plane(origin=(5.495, 0.175, -6.05), x_dir=(1, 0, 0), z_dir=(0, 1, 0))) as fillet3_piece_1:
        with BuildLine():
            CenterArc((FILLET3_R, -FILLET3_R), FILLET3_R, 90, 90)
            Line((0, -FILLET3_R), (0, 0))
            Line((0, 0), (FILLET3_R, 0))
        make_face()
    extrude(amount=3.35, mode=Mode.SUBTRACT)
    with BuildSketch(Plane(origin=(4.695, 0.175, -6.05), x_dir=(-1, 0, 0), z_dir=(0, 1, 0)), Plane(origin=(-4.225, 0.175, -6.05), x_dir=(-1, 0, 0), z_dir=(0, 1, 0)), Plane(origin=(-3.425, 0.175, -6.05), x_dir=(0, 0, 1), z_dir=(0, 1, 0)), Plane(origin=(-2.955, 0.175, -6.05), x_dir=(-1, 0, 0), z_dir=(0, 1, 0)), Plane(origin=(-2.155, 0.175, -6.05), x_dir=(0, 0, 1), z_dir=(0, 1, 0)), Plane(origin=(-1.675, 0.175, -6.05), x_dir=(-1, 0, 0), z_dir=(0, 1, 0)), Plane(origin=(-0.875, 0.175, -6.05), x_dir=(0, 0, 1), z_dir=(0, 1, 0)), Plane(origin=(-0.405, 0.175, -6.05), x_dir=(-1, 0, 0), z_dir=(0, 1, 0)), Plane(origin=(0.395, 0.175, -6.05), x_dir=(0, 0, 1), z_dir=(0, 1, 0)), Plane(origin=(0.875, 0.175, -6.05), x_dir=(-1, 0, 0), z_dir=(0, 1, 0)), Plane(origin=(1.675, 0.175, -6.05), x_dir=(0, 0, 1), z_dir=(0, 1, 0)), Plane(origin=(-5.495, 0.175, -6.05), x_dir=(-1, 0, 0), z_dir=(0, 1, 0)), Plane(origin=(-4.695, 0.175, -6.05), x_dir=(0, 0, 1), z_dir=(0, 1, 0)), Plane(origin=(3.425, 0.175, -6.05), x_dir=(-1, 0, 0), z_dir=(0, 1, 0)), Plane(origin=(4.225, 0.175, -6.05), x_dir=(0, 0, 1), z_dir=(0, 1, 0)), Plane(origin=(2.145, 0.175, -6.05), x_dir=(-1, 0, 0), z_dir=(0, 1, 0)), Plane(origin=(2.945, 0.175, -6.05), x_dir=(0, 0, 1), z_dir=(0, 1, 0))) as fillet3_piece_2:
        with BuildLine():
            CenterArc((FILLET3_R, FILLET3_R), FILLET3_R, 180, 90)
            Line((0, FILLET3_R), (0, 0))
            Line((0, 0), (FILLET3_R, 0))
        make_face()
    extrude(amount=3.35, mode=Mode.SUBTRACT)

    # Sketch14 → Cut-Extrude11 (cut)
    with BuildSketch(Plane(origin=(0, 0, 0.3), x_dir=(-1, 0, 0), z_dir=(0, 0, -1))):
        with Locations((-2.55, 7.675)):
            Circle(SKETCH14_R)
        with Locations((-5.1, 7.675)):
            Circle(SKETCH14_R)
        with Locations((0, 7.675)):
            Circle(SKETCH14_R)
        with Locations((2.55, 7.675)):
            Circle(SKETCH14_R)
        with Locations((5.1, 7.675)):
            Circle(SKETCH14_R)
        with Locations((3.825, 4.725)):
            Circle(SKETCH14_R)
        with Locations((1.275, 4.725)):
            Circle(SKETCH14_R)
        with Locations((-1.275, 4.725)):
            Circle(SKETCH14_R)
        with Locations((-3.825, 4.725)):
            Circle(SKETCH14_R)
    extrude(amount=-CUT_EXTRUDE11_DEPTH, mode=Mode.SUBTRACT)


solid = part.part
